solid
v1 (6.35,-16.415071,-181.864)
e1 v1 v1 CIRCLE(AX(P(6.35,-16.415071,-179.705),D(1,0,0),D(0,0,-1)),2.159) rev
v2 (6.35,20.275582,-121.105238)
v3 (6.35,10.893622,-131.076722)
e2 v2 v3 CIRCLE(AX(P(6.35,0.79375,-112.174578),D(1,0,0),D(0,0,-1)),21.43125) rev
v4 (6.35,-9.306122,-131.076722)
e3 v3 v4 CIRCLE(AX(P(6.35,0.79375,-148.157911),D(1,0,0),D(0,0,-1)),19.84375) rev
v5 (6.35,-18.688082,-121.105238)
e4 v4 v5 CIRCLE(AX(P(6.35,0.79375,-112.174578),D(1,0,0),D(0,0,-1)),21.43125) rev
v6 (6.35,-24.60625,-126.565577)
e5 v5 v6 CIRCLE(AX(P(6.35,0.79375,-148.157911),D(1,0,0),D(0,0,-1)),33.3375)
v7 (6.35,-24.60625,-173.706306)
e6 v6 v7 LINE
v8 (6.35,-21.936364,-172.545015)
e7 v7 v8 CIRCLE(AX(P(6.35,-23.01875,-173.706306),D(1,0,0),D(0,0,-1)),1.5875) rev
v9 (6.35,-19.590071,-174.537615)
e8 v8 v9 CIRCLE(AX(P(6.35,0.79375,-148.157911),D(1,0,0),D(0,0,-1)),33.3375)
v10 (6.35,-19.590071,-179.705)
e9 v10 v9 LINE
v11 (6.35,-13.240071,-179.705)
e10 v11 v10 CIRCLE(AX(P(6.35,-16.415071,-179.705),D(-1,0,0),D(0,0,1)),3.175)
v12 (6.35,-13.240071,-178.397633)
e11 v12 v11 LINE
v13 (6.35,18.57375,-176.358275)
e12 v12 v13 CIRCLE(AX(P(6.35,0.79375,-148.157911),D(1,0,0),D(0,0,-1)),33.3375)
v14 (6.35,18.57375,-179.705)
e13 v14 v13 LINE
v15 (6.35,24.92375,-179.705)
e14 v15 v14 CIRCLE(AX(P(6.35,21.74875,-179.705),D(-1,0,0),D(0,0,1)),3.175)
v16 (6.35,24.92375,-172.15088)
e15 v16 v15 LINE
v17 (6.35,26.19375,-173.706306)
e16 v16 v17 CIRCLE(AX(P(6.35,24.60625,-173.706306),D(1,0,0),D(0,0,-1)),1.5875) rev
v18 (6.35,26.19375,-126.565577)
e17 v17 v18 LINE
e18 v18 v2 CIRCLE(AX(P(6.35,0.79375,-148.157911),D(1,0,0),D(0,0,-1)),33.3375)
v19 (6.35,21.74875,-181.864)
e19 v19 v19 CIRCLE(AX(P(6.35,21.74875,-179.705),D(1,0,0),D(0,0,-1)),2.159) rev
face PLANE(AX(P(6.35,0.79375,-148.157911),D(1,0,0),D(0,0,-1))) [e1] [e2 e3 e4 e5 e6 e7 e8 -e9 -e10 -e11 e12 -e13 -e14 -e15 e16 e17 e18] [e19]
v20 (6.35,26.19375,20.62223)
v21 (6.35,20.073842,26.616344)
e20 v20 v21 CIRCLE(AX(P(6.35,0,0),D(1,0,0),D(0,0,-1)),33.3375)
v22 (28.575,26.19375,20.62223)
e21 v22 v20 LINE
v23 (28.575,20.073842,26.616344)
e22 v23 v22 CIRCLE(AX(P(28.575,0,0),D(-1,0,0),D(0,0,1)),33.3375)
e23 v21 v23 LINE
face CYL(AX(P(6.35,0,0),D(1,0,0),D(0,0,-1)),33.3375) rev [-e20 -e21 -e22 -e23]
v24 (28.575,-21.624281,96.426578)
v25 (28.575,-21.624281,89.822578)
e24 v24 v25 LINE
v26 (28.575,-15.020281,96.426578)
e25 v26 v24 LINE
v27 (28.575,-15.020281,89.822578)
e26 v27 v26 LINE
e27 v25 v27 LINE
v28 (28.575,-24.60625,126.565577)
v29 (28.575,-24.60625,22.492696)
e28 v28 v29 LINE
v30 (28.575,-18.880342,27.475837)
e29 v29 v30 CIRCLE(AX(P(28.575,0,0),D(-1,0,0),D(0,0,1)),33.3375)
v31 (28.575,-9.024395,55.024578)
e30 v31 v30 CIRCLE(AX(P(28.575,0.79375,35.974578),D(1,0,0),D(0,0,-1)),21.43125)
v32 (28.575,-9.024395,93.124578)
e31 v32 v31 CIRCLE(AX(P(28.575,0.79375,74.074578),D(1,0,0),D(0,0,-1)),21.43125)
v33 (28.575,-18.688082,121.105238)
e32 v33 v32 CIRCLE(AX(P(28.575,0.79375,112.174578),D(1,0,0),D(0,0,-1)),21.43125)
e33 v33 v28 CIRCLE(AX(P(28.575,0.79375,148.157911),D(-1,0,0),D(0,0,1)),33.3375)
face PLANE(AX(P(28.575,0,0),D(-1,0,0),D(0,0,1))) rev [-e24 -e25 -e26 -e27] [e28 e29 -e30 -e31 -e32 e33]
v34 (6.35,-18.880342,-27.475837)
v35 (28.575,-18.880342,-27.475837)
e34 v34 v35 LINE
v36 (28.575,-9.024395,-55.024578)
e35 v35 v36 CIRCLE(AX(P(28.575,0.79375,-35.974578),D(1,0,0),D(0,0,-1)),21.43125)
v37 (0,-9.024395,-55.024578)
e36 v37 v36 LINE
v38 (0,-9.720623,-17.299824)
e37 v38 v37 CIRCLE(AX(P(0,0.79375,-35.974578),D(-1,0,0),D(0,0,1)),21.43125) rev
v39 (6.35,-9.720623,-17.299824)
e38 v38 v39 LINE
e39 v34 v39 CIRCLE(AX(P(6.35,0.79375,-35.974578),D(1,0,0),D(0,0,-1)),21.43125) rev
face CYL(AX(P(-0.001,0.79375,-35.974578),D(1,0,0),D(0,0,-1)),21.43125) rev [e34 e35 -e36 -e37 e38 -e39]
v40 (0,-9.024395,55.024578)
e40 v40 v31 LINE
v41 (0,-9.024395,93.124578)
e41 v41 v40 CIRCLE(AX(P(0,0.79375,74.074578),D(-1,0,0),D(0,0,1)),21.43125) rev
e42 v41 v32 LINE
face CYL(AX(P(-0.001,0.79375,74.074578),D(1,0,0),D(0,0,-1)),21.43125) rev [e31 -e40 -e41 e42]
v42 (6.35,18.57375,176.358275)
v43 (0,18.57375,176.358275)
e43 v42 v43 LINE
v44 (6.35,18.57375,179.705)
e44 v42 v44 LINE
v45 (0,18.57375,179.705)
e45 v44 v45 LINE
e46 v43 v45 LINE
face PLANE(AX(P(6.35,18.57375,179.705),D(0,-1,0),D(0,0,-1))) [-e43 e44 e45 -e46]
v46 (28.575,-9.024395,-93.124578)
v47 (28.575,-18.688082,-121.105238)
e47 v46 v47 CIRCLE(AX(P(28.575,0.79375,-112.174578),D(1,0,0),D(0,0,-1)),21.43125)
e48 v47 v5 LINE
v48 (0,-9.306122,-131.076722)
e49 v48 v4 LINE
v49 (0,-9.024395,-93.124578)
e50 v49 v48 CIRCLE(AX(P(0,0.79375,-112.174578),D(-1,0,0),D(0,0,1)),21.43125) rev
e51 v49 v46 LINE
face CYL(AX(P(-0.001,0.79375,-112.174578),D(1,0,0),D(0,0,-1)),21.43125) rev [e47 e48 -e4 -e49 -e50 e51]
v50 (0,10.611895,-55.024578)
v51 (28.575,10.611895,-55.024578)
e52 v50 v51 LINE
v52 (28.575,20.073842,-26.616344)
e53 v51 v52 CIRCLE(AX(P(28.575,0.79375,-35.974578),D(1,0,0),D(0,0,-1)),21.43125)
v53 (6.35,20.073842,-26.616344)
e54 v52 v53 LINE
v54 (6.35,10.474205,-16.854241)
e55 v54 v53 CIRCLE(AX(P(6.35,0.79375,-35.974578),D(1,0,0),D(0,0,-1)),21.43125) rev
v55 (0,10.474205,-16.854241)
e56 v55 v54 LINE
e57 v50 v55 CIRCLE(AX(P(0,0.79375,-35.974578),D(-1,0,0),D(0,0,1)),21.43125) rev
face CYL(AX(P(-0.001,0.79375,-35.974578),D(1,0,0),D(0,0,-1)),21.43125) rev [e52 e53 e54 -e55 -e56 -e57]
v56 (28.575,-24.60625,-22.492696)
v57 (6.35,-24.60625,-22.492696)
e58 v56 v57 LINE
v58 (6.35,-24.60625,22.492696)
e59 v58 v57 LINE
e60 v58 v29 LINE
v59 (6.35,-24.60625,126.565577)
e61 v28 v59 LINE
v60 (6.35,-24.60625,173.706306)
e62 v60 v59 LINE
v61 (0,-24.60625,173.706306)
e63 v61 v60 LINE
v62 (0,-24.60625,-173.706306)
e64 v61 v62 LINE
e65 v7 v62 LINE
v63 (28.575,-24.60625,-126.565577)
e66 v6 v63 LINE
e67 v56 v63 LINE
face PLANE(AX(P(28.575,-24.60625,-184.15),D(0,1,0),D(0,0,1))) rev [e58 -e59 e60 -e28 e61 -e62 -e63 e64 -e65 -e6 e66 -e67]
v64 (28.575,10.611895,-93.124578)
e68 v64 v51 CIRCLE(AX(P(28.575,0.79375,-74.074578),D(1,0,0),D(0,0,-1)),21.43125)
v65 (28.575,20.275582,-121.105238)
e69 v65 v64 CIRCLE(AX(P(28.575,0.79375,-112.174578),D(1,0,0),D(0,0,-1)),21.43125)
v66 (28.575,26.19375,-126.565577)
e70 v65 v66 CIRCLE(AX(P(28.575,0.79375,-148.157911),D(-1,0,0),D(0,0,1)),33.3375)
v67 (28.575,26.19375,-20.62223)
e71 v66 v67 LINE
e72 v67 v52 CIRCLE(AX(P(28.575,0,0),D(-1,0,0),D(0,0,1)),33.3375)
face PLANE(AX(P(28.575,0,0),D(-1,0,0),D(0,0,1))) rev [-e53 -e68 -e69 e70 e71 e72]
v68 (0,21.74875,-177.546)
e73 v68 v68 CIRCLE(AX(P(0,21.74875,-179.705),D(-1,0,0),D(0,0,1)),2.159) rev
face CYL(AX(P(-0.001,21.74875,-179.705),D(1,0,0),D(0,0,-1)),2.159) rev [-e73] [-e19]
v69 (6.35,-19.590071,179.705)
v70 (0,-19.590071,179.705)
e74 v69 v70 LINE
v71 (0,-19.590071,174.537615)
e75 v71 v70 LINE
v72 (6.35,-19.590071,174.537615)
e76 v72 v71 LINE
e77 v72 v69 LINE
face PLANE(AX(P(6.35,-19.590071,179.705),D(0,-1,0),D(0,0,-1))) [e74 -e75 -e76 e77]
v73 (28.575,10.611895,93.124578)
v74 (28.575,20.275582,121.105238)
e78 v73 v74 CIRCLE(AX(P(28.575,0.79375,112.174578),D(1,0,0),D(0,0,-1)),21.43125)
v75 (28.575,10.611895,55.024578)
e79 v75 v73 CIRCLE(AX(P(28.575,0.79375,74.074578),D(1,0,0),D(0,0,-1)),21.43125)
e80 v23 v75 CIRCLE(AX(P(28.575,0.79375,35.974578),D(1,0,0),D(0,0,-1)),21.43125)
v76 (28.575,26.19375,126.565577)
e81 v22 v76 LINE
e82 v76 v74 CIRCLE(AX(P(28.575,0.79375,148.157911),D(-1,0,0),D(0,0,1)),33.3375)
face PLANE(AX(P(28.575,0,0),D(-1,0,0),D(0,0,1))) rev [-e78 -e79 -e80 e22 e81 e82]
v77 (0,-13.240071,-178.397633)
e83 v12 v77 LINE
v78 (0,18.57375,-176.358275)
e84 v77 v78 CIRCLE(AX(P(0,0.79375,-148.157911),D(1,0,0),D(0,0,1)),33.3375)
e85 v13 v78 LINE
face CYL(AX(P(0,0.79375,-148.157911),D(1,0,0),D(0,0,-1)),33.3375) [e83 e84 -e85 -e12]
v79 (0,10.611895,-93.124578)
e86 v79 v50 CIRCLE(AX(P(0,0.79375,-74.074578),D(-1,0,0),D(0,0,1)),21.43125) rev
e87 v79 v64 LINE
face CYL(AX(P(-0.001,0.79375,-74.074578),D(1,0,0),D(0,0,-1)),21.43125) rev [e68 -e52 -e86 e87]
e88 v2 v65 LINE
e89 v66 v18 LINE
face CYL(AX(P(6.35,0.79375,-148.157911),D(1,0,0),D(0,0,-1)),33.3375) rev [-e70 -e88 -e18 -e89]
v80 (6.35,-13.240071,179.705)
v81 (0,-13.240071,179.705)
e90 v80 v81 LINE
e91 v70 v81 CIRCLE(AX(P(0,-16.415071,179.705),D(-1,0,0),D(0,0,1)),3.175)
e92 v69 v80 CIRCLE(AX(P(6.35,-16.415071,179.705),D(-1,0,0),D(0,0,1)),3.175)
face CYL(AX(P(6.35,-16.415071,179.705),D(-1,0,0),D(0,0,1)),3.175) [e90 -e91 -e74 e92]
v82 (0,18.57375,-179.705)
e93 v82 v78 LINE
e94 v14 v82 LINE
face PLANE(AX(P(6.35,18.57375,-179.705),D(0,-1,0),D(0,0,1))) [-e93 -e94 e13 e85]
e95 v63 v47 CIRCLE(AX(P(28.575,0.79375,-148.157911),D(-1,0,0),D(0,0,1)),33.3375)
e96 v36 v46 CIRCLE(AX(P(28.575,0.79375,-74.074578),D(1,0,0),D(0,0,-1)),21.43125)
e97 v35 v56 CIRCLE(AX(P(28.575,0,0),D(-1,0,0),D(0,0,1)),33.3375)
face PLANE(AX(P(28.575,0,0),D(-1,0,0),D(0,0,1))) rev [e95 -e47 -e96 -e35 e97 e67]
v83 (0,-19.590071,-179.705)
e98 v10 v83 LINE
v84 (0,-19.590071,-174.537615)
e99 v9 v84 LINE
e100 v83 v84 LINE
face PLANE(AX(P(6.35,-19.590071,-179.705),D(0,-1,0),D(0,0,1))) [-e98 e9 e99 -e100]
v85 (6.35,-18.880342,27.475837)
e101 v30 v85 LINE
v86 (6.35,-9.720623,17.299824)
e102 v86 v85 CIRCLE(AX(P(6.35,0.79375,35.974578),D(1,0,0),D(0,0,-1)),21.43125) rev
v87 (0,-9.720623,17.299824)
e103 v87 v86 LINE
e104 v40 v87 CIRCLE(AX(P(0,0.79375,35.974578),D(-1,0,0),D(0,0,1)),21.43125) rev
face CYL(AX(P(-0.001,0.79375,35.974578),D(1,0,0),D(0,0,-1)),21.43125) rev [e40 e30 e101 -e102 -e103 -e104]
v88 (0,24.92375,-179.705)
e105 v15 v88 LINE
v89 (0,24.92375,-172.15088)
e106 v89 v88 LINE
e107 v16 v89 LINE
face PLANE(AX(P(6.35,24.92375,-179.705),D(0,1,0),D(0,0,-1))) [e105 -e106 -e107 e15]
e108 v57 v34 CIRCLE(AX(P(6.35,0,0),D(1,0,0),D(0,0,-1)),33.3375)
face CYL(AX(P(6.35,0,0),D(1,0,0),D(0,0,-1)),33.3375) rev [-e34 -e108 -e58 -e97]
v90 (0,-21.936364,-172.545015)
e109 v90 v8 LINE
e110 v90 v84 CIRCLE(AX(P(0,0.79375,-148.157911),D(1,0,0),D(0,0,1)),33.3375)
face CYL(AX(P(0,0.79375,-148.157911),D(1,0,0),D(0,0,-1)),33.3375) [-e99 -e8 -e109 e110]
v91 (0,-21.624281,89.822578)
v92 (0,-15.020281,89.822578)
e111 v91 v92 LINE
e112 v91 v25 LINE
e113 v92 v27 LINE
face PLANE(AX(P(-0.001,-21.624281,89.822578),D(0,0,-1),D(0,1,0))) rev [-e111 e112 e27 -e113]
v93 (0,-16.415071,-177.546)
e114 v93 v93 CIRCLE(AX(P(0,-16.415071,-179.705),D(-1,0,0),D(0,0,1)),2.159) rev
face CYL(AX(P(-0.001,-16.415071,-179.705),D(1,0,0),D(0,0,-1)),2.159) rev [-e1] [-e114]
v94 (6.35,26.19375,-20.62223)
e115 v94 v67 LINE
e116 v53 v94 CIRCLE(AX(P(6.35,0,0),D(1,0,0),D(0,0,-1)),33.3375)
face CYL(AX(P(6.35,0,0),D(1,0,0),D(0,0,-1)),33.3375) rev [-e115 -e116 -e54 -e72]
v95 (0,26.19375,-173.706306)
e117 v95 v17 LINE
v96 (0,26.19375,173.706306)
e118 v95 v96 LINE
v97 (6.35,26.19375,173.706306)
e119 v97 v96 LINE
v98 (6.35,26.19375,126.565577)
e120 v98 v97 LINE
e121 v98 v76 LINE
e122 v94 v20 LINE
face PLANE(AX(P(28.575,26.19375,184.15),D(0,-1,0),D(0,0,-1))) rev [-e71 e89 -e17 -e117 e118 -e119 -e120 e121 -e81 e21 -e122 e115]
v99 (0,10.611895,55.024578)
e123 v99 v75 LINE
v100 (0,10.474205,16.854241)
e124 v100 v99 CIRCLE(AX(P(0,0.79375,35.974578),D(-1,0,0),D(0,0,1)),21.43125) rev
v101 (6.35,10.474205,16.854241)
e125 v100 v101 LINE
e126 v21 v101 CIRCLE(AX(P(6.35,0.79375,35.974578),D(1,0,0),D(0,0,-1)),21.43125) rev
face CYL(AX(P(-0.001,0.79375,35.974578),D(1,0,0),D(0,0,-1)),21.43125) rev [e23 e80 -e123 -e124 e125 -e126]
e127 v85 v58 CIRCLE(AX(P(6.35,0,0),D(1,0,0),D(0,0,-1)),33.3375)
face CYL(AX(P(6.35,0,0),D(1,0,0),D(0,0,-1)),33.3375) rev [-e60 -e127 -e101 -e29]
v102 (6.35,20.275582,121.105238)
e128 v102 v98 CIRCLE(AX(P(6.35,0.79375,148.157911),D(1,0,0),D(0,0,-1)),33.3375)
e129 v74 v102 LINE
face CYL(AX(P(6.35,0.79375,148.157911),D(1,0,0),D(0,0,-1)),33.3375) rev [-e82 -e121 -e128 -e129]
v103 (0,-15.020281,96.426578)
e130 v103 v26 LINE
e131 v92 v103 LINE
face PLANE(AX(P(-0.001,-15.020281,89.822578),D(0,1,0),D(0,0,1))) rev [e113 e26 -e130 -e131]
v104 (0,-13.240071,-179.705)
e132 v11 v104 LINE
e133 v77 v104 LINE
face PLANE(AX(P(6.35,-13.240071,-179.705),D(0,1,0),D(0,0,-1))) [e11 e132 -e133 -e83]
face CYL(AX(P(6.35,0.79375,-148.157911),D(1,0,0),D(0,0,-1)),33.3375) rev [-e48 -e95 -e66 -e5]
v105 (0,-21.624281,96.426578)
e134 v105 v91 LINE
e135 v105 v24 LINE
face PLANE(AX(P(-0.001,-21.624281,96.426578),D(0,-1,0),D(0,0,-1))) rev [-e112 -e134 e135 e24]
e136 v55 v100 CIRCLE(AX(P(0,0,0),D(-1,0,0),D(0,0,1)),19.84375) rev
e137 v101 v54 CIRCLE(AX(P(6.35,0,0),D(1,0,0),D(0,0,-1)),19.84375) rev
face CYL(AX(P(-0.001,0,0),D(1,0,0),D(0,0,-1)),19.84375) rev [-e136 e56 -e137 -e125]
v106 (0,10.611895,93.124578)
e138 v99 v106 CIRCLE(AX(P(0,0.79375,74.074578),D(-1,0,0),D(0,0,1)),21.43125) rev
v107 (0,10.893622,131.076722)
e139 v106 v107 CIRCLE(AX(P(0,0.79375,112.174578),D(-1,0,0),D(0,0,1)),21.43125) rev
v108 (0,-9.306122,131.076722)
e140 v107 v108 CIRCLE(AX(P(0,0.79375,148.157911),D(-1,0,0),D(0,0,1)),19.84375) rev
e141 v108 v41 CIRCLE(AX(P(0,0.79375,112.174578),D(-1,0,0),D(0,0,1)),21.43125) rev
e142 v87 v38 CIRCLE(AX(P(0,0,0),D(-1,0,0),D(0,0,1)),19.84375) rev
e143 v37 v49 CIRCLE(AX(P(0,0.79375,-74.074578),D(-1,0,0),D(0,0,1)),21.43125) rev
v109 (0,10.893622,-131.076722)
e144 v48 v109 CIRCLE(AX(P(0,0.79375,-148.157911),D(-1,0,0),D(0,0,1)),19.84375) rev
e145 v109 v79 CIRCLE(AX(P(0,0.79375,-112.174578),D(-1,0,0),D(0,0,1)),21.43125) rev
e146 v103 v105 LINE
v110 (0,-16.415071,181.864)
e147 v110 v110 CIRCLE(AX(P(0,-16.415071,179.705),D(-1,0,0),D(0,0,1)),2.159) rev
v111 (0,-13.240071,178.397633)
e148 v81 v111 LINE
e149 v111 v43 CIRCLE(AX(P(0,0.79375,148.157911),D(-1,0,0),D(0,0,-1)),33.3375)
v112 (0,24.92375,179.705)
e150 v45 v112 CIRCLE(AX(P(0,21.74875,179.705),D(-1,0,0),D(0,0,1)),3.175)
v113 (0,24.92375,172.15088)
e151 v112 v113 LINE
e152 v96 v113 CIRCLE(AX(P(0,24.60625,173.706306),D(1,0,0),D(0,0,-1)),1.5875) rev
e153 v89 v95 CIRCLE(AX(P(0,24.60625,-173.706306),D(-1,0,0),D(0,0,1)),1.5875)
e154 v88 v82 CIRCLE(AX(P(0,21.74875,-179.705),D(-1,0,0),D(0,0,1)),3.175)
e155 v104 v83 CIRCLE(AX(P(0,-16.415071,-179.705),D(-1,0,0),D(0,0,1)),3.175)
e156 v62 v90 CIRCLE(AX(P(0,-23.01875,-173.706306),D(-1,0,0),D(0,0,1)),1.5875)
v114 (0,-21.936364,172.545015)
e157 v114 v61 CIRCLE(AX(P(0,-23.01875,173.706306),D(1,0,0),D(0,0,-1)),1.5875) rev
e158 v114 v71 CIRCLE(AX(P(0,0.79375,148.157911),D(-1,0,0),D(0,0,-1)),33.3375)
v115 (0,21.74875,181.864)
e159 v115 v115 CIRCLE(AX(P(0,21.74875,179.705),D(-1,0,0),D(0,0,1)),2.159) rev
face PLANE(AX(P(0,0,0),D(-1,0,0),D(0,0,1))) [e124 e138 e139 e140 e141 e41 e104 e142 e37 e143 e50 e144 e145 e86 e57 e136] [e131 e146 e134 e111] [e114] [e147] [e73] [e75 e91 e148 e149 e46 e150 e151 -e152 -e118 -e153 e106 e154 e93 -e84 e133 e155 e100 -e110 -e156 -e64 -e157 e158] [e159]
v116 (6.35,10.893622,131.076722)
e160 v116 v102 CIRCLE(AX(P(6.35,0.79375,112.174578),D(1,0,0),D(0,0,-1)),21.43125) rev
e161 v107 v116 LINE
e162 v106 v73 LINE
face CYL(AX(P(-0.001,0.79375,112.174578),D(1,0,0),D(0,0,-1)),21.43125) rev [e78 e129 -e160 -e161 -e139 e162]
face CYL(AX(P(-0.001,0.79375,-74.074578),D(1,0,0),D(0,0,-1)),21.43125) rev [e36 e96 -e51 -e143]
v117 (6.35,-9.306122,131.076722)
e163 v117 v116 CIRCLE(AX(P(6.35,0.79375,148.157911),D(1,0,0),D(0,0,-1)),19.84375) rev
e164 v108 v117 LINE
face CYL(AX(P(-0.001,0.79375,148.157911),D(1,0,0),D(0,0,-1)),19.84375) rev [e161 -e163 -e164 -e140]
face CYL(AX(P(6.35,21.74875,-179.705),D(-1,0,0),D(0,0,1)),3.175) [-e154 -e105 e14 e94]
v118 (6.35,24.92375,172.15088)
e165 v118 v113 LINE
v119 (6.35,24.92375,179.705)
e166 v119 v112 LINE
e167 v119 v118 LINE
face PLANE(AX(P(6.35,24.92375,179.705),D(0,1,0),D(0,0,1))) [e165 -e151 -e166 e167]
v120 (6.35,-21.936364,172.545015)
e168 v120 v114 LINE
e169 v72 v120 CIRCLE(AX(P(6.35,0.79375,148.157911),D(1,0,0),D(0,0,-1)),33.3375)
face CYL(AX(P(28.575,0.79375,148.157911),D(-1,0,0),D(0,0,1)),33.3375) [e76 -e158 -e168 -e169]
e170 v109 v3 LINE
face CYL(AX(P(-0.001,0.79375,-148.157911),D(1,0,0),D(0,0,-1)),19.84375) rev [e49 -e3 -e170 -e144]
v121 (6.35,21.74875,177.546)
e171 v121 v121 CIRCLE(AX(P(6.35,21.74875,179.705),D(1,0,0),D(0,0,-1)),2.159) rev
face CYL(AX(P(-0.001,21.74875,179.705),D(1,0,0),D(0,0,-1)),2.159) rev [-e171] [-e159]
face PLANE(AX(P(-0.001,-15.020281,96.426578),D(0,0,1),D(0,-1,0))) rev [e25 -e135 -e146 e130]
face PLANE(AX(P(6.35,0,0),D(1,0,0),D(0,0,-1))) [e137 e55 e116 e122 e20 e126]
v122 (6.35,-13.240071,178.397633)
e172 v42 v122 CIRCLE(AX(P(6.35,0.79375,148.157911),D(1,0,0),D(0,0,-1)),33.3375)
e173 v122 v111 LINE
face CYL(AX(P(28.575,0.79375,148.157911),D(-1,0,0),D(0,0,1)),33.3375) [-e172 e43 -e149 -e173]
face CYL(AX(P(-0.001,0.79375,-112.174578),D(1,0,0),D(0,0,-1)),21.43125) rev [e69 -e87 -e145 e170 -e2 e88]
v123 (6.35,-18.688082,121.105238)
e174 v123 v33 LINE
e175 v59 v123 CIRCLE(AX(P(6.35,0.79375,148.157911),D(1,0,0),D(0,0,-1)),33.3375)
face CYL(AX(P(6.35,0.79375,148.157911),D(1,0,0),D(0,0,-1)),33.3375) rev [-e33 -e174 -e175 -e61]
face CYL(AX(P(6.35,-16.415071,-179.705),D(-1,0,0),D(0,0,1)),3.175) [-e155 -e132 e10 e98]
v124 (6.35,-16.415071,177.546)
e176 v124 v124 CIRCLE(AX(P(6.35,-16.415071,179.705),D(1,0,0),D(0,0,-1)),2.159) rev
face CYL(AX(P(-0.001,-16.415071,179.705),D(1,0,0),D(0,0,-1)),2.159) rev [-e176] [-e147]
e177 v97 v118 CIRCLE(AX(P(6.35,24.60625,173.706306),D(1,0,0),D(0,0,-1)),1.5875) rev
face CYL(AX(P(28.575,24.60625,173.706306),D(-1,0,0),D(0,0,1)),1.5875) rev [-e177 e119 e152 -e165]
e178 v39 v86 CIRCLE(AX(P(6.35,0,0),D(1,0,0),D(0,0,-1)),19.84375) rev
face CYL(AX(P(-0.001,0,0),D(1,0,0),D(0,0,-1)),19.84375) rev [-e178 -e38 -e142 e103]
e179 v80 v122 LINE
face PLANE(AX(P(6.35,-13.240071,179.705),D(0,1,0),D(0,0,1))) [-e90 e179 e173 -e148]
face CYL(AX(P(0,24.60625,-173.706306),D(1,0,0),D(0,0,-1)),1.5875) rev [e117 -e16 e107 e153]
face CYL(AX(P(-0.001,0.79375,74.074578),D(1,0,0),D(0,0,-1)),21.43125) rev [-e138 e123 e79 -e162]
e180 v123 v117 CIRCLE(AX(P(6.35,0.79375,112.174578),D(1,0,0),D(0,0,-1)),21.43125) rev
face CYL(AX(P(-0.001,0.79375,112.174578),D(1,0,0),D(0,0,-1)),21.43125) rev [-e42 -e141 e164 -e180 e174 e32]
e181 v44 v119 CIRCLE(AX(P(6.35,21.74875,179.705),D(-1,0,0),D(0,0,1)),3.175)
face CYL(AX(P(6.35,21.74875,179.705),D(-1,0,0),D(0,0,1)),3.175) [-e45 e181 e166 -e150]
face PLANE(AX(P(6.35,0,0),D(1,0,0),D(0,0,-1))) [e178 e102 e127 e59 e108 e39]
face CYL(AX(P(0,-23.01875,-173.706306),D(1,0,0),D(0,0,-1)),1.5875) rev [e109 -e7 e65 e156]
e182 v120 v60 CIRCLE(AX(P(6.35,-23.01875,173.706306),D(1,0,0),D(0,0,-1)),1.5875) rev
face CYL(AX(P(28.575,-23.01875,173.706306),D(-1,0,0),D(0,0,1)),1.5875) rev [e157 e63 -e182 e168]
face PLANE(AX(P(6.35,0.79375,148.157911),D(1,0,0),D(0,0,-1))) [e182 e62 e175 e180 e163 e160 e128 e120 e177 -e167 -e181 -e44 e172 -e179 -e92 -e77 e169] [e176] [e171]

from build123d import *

# Parameters (mm, degrees)
SKETCH1_W           = 368.3
SKETCH1_H           = 50.8
BOSS_EXTRUDE1_DEPTH = 28.575
CHAMFER1_SIZE       = 6.35
FILLET1_R           = 3.175
SKETCH2_R           = 33.3375
CUT_EXTRUDE1_DEPTH  = 22.225
CUT_EXTRUDE2_REACH  = 190.186
CUT_EXTRUDE3_REACH  = 190.186
SKETCH5_W           = 6.604
SKETCH5_H           = 6.604
FILLET2_R           = 1.5875
CAVITY1_START       = 6.35
CAVITY1_OUTLINE_R   = 1.905
CAVITY1_DEPTH       = 22.225
CAVITY1_2_DEPTH     = 6.35
CUT_EXTRUDE4_REACH  = 188.943
SKETCH7_R           = 2.159


# Read off the part's stored shape, not the designer's step: Cavity1
with BuildPart() as part:
    # Sketch1 → Boss-Extrude1 (new body)
    with BuildSketch(Plane(origin=(0, 0, 0), x_dir=(0, 0, -1), z_dir=(1, 0, 0))):
        with Locations((0, 0.79375)):
            Rectangle(SKETCH1_W, SKETCH1_H)
    extrude(amount=BOSS_EXTRUDE1_DEPTH)

    # Chamfer1
    chamfer1_edges = [part.edges().sort_by_distance(p)[0] for p in [
        (14.2875, -24.60625, 184.15),
        (14.2875, -24.60625, -184.15),
    ]]
    chamfer(chamfer1_edges, length=CHAMFER1_SIZE)

    # Fillet1
    fillet1_edges = [part.edges().sort_by_distance(p)[0] for p in [
        (14.2875, -18.25625, -184.15),
        (14.2875, -24.60625, 177.8),
        (14.2875, -24.60625, -177.8),
        (14.2875, -18.25625, 184.15),
        (14.2875, 26.19375, 184.15),
        (14.2875, 26.19375, -184.15),
    ]]
    fillet(fillet1_edges, radius=FILLET1_R)

    # Sketch2 → Cut-Extrude1 (cut)
    with BuildSketch(Plane(origin=(28.575, 0, 0), x_dir=(0, 0, -1), z_dir=(1, 0, 0))):
        with Locations((-148.157911006, 0.79375)):
            Circle(SKETCH2_R)
        Circle(SKETCH2_R)
        with Locations((148.157911006, 0.79375)):
            Circle(SKETCH2_R)
    extrude(amount=-CUT_EXTRUDE1_DEPTH, mode=Mode.SUBTRACT)

    # Sketch4 → Cut-Extrude2 (cut, up to next)
    with BuildSketch(Plane(origin=(28.575, 0, 0), x_dir=(0, 0, -1), z_dir=(1, 0, 0)), mode=Mode.PRIVATE) as cut_extrude2_sk1:
        with BuildLine():
            ThreePointArc((-131.07672228, 10.893621573), (-168.001661006, 0.79375), (-131.07672228, -9.306121573))
            ThreePointArc((-131.07672228, -9.306121573), (-112.015493633, -20.636909552), (-93.124577673, -9.024395271))
            ThreePointArc((-93.124577673, -9.024395271), (-74.074577673, -20.6375), (-55.024577673, -9.024395271))
            ThreePointArc((-55.024577673, -9.024395271), (-36.370033983, -20.633851146), (-17.299823722, -9.720623089))
            ThreePointArc((-17.299823722, -9.720623089), (0, -19.84375), (17.299823722, -9.720623089))
            ThreePointArc((17.299823722, -9.720623089), (36.370033983, -20.633851146), (55.024577673, -9.024395271))
            ThreePointArc((55.024577673, -9.024395271), (74.074577673, -20.6375), (93.124577673, -9.024395271))
            ThreePointArc((93.124577673, -9.024395271), (112.015493633, -20.636909552), (131.07672228, -9.306121573))
            ThreePointArc((131.07672228, -9.306121573), (168.001661006, 0.79375), (131.07672228, 10.893621573))
            ThreePointArc((131.07672228, 10.893621573), (112.015493633, 22.224409552), (93.124577673, 10.611895271))
            ThreePointArc((93.124577673, 10.611895271), (74.074577673, 22.225), (55.024577673, 10.611895271))
            ThreePointArc((55.024577673, 10.611895271), (35.897270086, 22.224860566), (16.854241153, 10.474204945))
            ThreePointArc((16.854241153, 10.474204945), (0, 19.84375), (-16.854241153, 10.474204945))
            ThreePointArc((-16.854241153, 10.474204945), (-35.897270086, 22.224860566), (-55.024577673, 10.611895271))
            ThreePointArc((-55.024577673, 10.611895271), (-74.074577673, 22.225), (-93.124577673, 10.611895271))
            ThreePointArc((-93.124577673, 10.611895271), (-112.015493633, 22.224409552), (-131.07672228, 10.893621573))
        make_face()
    cut_extrude2_tool1 = extrude(cut_extrude2_sk1.sketch, amount=-CUT_EXTRUDE2_REACH, mode=Mode.PRIVATE) & part.part
    add(cut_extrude2_tool1.solids().sort_by_distance((28.575, 0.715797, 0))[0], mode=Mode.SUBTRACT)

    # Sketch5 → Cut-Extrude3 (cut, up to next)
    with BuildSketch(Plane(origin=(28.575, 0, 0), x_dir=(0, 0, -1), z_dir=(1, 0, 0)), mode=Mode.PRIVATE) as cut_extrude3_sk1:
        with Locations((-93.124577673, -18.322281394)):
            Rectangle(SKETCH5_W, SKETCH5_H)
    cut_extrude3_tool1 = extrude(cut_extrude3_sk1.sketch, amount=-CUT_EXTRUDE3_REACH, mode=Mode.PRIVATE) & part.part
    add(cut_extrude3_tool1.solids().sort_by_distance((28.575, -18.322281, 93.124578))[0], mode=Mode.SUBTRACT)

    # Fillet2
    fillet2_edges = [part.edges().sort_by_distance(p)[0] for p in [
        (17.4625, -24.60625, -169.750245438),
        (17.4625, 26.19375, -169.750245438),
        (17.4625, -24.60625, 169.750245438),
        (17.4625, 26.19375, 169.750245438),
    ]]
    fillet(fillet2_edges, radius=FILLET2_R)

    # Cavity1 outline → Cavity1 (cut)
    # profile 1 of 2: a face of its own
    with BuildSketch(Plane.YZ.offset(CAVITY1_START)):
        with BuildLine():
            ThreePointArc((-21.936363636, 172.545014982), (-20.786227921, 173.568410001), (-19.590070715, 174.537614554))
            ThreePointArc((-19.590070715, 174.537614554), (-16.522960019, 176.64510919), (-13.240070715, 178.397632936))
            ThreePointArc((-13.240070715, 178.397632936), (2.926403377, 181.427126443), (18.57375, 176.358274589))
            ThreePointArc((18.57375, 176.358274589), (21.138345447, 174.567877729), (23.523863636, 172.545014982))
            ThreePointArc((23.523863636, 172.545014982), (24.176019306, 172.178216056), (24.92375, 172.150879661))
            ThreePointArc((24.92375, 172.150879661), (25.835922212, 172.70228249), (26.19375, 173.706305647))
            Line((26.19375, 173.706305647), (26.19375, 180.975))
            ThreePointArc((26.19375, 180.975), (25.26381403, 183.22006403), (23.01875, 184.15))
            Line((23.01875, 184.15), (-16.941121939, 184.15))
            ThreePointArc((-16.941121939, 184.15), (-18.156141837, 183.908317516), (-19.18618597, 183.22006403))
            Line((-19.18618597, 183.22006403), (-23.67631403, 178.72993597))
            ThreePointArc((-23.67631403, 178.72993597), (-24.364567516, 177.699891837), (-24.60625, 176.484871939))
            Line((-24.60625, 176.484871939), (-24.60625, 173.706305647))
            ThreePointArc((-24.60625, 173.706305647), (-23.651943453, 172.250550757), (-21.936363636, 172.545014982))
        make_face()
        with Locations((-16.415070715, 179.705)):
            Circle(CAVITY1_OUTLINE_R, mode=Mode.SUBTRACT)
        with Locations((21.74875, 179.705)):
            Circle(CAVITY1_OUTLINE_R, mode=Mode.SUBTRACT)
    # profile 2 of 2: a face of its own
    with BuildSketch(Plane.YZ.offset(CAVITY1_START)):
        with BuildLine():
            ThreePointArc((-21.936363636, -172.545014982), (-23.651943453, -172.250550757), (-24.60625, -173.706305647))
            Line((-24.60625, -173.706305647), (-24.60625, -176.484871939))
            ThreePointArc((-24.60625, -176.484871939), (-24.364567516, -177.699891837), (-23.67631403, -178.72993597))
            Line((-23.67631403, -178.72993597), (-19.18618597, -183.22006403))
            ThreePointArc((-19.18618597, -183.22006403), (-18.156141837, -183.908317516), (-16.941121939, -184.15))
            Line((-16.941121939, -184.15), (23.01875, -184.15))
            ThreePointArc((23.01875, -184.15), (25.26381403, -183.22006403), (26.19375, -180.975))
            Line((26.19375, -180.975), (26.19375, -173.706305647))
            ThreePointArc((26.19375, -173.706305647), (25.835922212, -172.70228249), (24.92375, -172.150879661))
            ThreePointArc((24.92375, -172.150879661), (24.176019306, -172.178216056), (23.523863636, -172.545014982))
            ThreePointArc((23.523863636, -172.545014982), (21.138345447, -174.567877729), (18.57375, -176.358274589))
            ThreePointArc((18.57375, -176.358274589), (2.926403377, -181.427126443), (-13.240070715, -178.397632935))
            ThreePointArc((-13.240070715, -178.397632935), (-16.522960019, -176.64510919), (-19.590070715, -174.537614554))
            ThreePointArc((-19.590070715, -174.537614554), (-20.786227921, -173.568410001), (-21.936363636, -172.545014982))
        make_face()
        with Locations((-16.415070715, -179.705)):
            Circle(CAVITY1_OUTLINE_R, mode=Mode.SUBTRACT)
        with Locations((21.74875, -179.705)):
            Circle(CAVITY1_OUTLINE_R, mode=Mode.SUBTRACT)
    extrude(amount=CAVITY1_DEPTH, mode=Mode.SUBTRACT)

    # Cavity1 2 outline → Cavity1 2 (cut)
    with BuildSketch(Plane.YZ):
        with BuildLine():
            Line((-13.240070715, 179.705), (-13.240070715, 178.397632935))
            ThreePointArc((-13.240070715, 178.397632935), (2.926403377, 181.427126443), (18.57375, 176.358274589))
            Line((18.57375, 176.358274589), (18.57375, 179.705))
            ThreePointArc((18.57375, 179.705), (21.74875, 182.88), (24.92375, 179.705))
            Line((24.92375, 179.705), (24.92375, 172.150879661))
            ThreePointArc((24.92375, 172.150879661), (25.835922212, 172.70228249), (26.19375, 173.706305647))
            Line((26.19375, 173.706305647), (26.19375, 180.975))
            ThreePointArc((26.19375, 180.975), (25.26381403, 183.22006403), (23.01875, 184.15))
            Line((23.01875, 184.15), (-16.941121939, 184.15))
            ThreePointArc((-16.941121939, 184.15), (-18.156141837, 183.908317516), (-19.18618597, 183.22006403))
            Line((-19.18618597, 183.22006403), (-23.67631403, 178.72993597))
            ThreePointArc((-23.67631403, 178.72993597), (-24.364567516, 177.699891837), (-24.60625, 176.484871939))
            Line((-24.60625, 176.484871939), (-24.60625, 173.706305647))
            ThreePointArc((-24.60625, 173.706305647), (-23.651943453, 172.250550757), (-21.936363636, 172.545014982))
            ThreePointArc((-21.936363636, 172.545014982), (-20.786227921, 173.568410001), (-19.590070715, 174.537614554))
            Line((-19.590070715, 174.537614554), (-19.590070715, 179.705))
            ThreePointArc((-19.590070715, 179.705), (-16.415070715, 182.88), (-13.240070715, 179.705))
        make_face()
        with BuildLine():
            ThreePointArc((-21.936363636, -172.545014982), (-23.651943453, -172.250550757), (-24.60625, -173.706305647))
            Line((-24.60625, -173.706305647), (-24.60625, -176.484871939))
            ThreePointArc((-24.60625, -176.484871939), (-24.364567516, -177.699891837), (-23.67631403, -178.72993597))
            Line((-23.67631403, -178.72993597), (-19.18618597, -183.22006403))
            ThreePointArc((-19.18618597, -183.22006403), (-18.156141837, -183.908317516), (-16.941121939, -184.15))
            Line((-16.941121939, -184.15), (23.01875, -184.15))
            ThreePointArc((23.01875, -184.15), (25.26381403, -183.22006403), (26.19375, -180.975))
            Line((26.19375, -180.975), (26.19375, -173.706305647))
            ThreePointArc((26.19375, -173.706305647), (25.835922212, -172.70228249), (24.92375, -172.150879661))
            Line((24.92375, -172.150879661), (24.92375, -179.705))
            ThreePointArc((24.92375, -179.705), (21.74875, -182.88), (18.57375, -179.705))
            Line((18.57375, -179.705), (18.57375, -176.358274589))
            ThreePointArc((18.57375, -176.358274589), (2.926403377, -181.427126443), (-13.240070715, -178.397632935))
            Line((-13.240070715, -178.397632935), (-13.240070715, -179.705))
            ThreePointArc((-13.240070715, -179.705), (-16.415070715, -182.88), (-19.590070715, -179.705))
            Line((-19.590070715, -179.705), (-19.590070715, -174.537614554))
            ThreePointArc((-19.590070715, -174.537614554), (-20.786227921, -173.568410001), (-21.936363636, -172.545014982))
        make_face()
    extrude(amount=CAVITY1_2_DEPTH, mode=Mode.SUBTRACT)

    # Sketch7 → Cut-Extrude4 (cut, up to next)
    with BuildSketch(Plane(origin=(28.575, 0, 0), x_dir=(0, 0, -1), z_dir=(1, 0, 0)), mode=Mode.PRIVATE) as cut_extrude4_sk1:
        with Locations((-179.705, 21.74875)):
            Circle(SKETCH7_R)
    cut_extrude4_tool1 = extrude(cut_extrude4_sk1.sketch, amount=-CUT_EXTRUDE4_REACH, mode=Mode.PRIVATE) & part.part
    # Sketch7 → Cut-Extrude4 (cut, up to next)
    with BuildSketch(Plane(origin=(28.575, 0, 0), x_dir=(0, 0, -1), z_dir=(1, 0, 0)), mode=Mode.PRIVATE) as cut_extrude4_sk2:
        with Locations((-179.705, -16.415070715)):
            Circle(SKETCH7_R)
    cut_extrude4_tool2 = extrude(cut_extrude4_sk2.sketch, amount=-CUT_EXTRUDE4_REACH, mode=Mode.PRIVATE) & part.part
    # Sketch7 → Cut-Extrude4 (cut, up to next)
    with BuildSketch(Plane(origin=(28.575, 0, 0), x_dir=(0, 0, -1), z_dir=(1, 0, 0)), mode=Mode.PRIVATE) as cut_extrude4_sk3:
        with Locations((179.705, 21.74875)):
            Circle(SKETCH7_R)
    cut_extrude4_tool3 = extrude(cut_extrude4_sk3.sketch, amount=-CUT_EXTRUDE4_REACH, mode=Mode.PRIVATE) & part.part
    # Sketch7 → Cut-Extrude4 (cut, up to next)
    with BuildSketch(Plane(origin=(28.575, 0, 0), x_dir=(0, 0, -1), z_dir=(1, 0, 0)), mode=Mode.PRIVATE) as cut_extrude4_sk4:
        with Locations((179.705, -16.415070715)):
            Circle(SKETCH7_R)
    cut_extrude4_tool4 = extrude(cut_extrude4_sk4.sketch, amount=-CUT_EXTRUDE4_REACH, mode=Mode.PRIVATE) & part.part
    add(cut_extrude4_tool1.solids().sort_by_distance((28.575, 21.74875, 179.705))[0], mode=Mode.SUBTRACT)
    add(cut_extrude4_tool2.solids().sort_by_distance((28.575, -16.415071, 179.705))[0], mode=Mode.SUBTRACT)
    add(cut_extrude4_tool3.solids().sort_by_distance((28.575, 21.74875, -179.705))[0], mode=Mode.SUBTRACT)
    add(cut_extrude4_tool4.solids().sort_by_distance((28.575, -16.415071, -179.705))[0], mode=Mode.SUBTRACT)


solid = part.part
